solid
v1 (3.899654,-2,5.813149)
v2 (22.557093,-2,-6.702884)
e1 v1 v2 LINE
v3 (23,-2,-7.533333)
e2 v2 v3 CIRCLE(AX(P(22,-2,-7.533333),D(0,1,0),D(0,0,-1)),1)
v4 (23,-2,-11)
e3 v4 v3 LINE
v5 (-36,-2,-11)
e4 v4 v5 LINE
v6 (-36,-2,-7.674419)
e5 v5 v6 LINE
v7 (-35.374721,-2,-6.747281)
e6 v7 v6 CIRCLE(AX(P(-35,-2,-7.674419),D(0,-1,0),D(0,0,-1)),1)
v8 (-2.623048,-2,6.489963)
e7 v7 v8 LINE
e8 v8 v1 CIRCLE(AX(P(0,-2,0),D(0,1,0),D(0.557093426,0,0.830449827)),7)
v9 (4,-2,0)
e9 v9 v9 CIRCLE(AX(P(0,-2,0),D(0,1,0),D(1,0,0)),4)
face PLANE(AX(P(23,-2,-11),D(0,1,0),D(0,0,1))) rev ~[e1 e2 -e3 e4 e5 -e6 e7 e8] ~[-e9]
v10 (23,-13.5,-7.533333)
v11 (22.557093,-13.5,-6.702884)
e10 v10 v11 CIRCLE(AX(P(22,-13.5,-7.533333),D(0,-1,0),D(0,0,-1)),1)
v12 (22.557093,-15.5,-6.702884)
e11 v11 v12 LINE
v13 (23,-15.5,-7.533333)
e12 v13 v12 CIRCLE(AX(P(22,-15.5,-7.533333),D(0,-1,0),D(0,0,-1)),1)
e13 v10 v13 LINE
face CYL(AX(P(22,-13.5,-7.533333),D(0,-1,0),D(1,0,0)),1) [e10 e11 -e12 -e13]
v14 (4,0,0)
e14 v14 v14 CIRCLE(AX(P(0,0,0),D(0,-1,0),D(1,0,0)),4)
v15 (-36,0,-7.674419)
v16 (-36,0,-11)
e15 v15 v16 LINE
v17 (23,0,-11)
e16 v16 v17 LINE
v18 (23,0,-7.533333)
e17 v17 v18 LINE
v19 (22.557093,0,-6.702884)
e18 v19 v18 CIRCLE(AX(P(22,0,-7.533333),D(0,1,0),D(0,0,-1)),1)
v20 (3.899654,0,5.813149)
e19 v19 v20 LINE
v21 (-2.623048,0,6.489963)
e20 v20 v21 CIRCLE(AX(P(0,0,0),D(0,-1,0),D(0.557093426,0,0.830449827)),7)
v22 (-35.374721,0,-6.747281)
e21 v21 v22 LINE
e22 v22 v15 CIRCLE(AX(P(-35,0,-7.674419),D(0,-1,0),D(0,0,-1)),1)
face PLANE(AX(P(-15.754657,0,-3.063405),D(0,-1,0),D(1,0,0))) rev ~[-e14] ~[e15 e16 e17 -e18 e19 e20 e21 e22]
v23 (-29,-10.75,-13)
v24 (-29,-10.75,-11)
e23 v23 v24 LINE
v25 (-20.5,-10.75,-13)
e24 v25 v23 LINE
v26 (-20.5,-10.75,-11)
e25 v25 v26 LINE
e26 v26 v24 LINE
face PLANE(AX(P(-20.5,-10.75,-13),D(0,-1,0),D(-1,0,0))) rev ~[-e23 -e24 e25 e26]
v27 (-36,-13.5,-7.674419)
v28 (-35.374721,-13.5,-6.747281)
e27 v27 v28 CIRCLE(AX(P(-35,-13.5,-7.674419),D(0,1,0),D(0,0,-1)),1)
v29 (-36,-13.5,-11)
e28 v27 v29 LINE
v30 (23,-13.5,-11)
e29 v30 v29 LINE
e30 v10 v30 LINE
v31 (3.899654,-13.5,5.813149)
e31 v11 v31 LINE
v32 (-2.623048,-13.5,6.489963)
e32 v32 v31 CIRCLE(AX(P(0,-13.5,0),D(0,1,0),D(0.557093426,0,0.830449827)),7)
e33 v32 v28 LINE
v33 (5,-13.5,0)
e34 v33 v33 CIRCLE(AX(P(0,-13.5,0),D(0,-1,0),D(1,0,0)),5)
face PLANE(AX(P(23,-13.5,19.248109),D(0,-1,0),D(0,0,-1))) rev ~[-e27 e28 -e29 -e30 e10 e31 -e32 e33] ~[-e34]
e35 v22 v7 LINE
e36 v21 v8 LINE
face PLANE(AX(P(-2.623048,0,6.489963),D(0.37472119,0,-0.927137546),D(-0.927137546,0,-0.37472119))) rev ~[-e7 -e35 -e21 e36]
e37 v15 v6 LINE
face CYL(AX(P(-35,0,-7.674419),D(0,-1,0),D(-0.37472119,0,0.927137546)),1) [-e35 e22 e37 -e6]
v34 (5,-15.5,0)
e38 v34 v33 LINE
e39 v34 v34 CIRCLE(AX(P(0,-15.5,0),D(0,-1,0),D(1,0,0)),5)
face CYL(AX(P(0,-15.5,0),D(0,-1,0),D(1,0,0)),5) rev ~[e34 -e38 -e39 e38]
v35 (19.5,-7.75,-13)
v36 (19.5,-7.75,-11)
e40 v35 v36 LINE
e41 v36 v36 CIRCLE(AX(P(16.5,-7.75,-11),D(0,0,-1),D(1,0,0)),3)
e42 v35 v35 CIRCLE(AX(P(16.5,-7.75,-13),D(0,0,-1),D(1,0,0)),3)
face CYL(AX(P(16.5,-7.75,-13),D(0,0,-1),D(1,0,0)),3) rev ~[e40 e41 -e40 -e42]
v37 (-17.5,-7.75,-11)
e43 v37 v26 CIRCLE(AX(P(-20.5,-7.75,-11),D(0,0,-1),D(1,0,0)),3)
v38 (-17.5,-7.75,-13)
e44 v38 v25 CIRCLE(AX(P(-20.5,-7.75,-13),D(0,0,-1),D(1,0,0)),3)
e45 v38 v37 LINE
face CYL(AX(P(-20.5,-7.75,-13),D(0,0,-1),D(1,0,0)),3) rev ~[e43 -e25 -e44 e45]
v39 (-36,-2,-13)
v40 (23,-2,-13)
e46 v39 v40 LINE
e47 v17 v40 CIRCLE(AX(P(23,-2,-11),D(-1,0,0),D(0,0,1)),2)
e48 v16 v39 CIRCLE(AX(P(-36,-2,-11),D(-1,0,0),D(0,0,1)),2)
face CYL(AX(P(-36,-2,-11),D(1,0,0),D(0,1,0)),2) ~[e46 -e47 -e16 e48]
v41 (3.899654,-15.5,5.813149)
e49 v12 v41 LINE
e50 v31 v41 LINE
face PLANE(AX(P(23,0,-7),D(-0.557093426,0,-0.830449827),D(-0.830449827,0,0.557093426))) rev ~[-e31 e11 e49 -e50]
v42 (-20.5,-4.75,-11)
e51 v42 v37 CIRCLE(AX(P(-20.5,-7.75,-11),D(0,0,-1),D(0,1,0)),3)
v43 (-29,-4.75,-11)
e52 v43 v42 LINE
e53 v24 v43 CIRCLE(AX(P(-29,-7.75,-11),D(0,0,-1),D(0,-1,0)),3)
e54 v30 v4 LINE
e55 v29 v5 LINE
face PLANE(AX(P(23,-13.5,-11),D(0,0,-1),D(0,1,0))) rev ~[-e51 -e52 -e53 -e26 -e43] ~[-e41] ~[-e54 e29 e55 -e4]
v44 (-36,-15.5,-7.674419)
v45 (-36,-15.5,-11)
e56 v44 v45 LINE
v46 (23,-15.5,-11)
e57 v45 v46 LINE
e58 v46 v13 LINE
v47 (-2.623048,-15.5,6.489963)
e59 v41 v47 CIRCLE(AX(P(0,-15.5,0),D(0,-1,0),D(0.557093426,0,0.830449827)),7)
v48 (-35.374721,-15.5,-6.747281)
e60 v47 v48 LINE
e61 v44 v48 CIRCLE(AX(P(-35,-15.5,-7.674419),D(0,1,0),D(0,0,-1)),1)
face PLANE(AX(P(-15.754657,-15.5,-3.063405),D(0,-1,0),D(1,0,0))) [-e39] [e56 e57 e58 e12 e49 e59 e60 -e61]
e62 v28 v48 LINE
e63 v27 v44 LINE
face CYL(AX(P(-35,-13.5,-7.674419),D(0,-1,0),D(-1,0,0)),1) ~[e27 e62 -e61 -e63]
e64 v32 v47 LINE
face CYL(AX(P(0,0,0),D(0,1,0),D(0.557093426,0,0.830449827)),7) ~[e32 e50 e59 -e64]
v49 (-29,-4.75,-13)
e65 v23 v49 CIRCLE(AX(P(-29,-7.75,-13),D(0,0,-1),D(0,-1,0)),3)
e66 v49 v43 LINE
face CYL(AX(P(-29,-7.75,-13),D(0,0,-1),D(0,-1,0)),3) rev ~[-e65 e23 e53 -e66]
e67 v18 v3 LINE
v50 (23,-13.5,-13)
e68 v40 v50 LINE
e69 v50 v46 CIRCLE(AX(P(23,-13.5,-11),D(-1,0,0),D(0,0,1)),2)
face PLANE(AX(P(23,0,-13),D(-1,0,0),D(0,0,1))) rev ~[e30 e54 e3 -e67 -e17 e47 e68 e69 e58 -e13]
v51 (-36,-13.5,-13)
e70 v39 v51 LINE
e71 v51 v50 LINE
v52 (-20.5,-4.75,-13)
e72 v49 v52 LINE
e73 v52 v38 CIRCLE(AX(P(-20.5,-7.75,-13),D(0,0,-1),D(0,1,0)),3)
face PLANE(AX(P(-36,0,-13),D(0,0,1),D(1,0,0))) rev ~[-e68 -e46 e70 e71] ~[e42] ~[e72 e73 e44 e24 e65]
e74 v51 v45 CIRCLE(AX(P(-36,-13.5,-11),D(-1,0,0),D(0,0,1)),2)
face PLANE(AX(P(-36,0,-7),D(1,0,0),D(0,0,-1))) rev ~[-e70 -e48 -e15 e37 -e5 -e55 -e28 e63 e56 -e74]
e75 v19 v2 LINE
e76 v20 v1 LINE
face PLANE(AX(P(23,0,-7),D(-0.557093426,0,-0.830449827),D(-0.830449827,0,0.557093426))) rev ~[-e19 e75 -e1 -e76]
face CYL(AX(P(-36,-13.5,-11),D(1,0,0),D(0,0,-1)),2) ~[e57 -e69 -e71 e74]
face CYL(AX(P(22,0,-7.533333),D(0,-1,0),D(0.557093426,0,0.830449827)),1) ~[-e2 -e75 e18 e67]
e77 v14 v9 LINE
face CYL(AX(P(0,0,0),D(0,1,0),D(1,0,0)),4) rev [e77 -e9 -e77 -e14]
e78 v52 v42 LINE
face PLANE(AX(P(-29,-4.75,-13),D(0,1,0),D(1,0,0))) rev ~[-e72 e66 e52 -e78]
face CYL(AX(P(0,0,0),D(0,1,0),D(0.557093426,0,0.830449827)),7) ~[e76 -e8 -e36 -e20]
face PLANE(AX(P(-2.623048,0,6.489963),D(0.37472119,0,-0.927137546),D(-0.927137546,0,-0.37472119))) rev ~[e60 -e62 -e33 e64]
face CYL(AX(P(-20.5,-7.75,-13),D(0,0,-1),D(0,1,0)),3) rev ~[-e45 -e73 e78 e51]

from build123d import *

# Parameters (mm, degrees)
F0_R     = 5
F0_R_2   = 4
F1_DEPTH = 15.5
F2_W     = 11.5
F2_H     = 26.2481089791
F2_H_2   = 4
F3_DEPTH = 59.001
F4_R     = 3
F5_DEPTH = 2
F6_R     = 1
F7_R     = 2
F8_R     = 5
F8_R_2   = 4
F9_DEPTH = 2


# Not quite as in the source:
# - a feature names something its author has since deleted; it is built from what else it names


with BuildPart() as f1:
    # F0 (on Front) → F1 (new body)
    with BuildSketch(Plane.XZ):
        with BuildLine():
            Line((-36, -7), (-4.54e-08, -7))
            ThreePointArc((-4.54e-08, -7), (-6.871307732, -1.3360875914), (-2.6230483271, 6.4899628253))
            Line((-2.6230483271, 6.4899628253), (-36, -7))
        make_face()
        Polygon((23, -7), (-4.54e-08, -7), (-36, -7), (-36, -13), (23, -13), align=None)
        with BuildLine():
            ThreePointArc((3.8996539792, 5.8131487889), (6.1764705882, 3.2941176471), (7, 0))
            ThreePointArc((7, 0), (4.9497474522, -4.9497474844), (-4.54e-08, -7))
            Line((-4.54e-08, -7), (23, -7))
            Line((23, -7), (3.8996539792, 5.8131487889))
        make_face()
        with BuildLine():
            ThreePointArc((-4.54e-08, -7), (4.9497474522, -4.9497474844), (7, 0))
            ThreePointArc((7, 0), (6.1764705882, 3.2941176471), (3.8996539792, 5.8131487889))
            ThreePointArc((3.8996539792, 5.8131487889), (0.7224609385, 6.9626180559), (-2.6230483271, 6.4899628253))
            ThreePointArc((-2.6230483271, 6.4899628253), (-6.871307732, -1.3360875914), (-4.54e-08, -7))
        make_face()
        Circle(F0_R, mode=Mode.SUBTRACT)
        Circle(F0_R)
        Circle(F0_R_2, mode=Mode.SUBTRACT)
    extrude(amount=F1_DEPTH)

    # F2 (on face) → F3 (cut, through all)
    with BuildSketch(Plane.YZ.offset(23)):
        with Locations((-7.75, 6.1240544895)):
            Rectangle(F2_W, F2_H)
        with Locations((-7.75, -9)):
            Rectangle(F2_W, F2_H_2)
    extrude(amount=-F3_DEPTH, mode=Mode.SUBTRACT)

    # F4 (on face) → F5 (cut)
    with BuildSketch(Plane(origin=(0, 0, -13), x_dir=(1, 0, 0), z_dir=(0, 0, -1))):
        with BuildLine():
            ThreePointArc((-29, 4.75), (-26.8786796564, 5.6286796564), (-26, 7.75))
            ThreePointArc((-26, 7.75), (-26.8786796564, 9.8713203436), (-29, 10.75))
            ThreePointArc((-29, 10.75), (-32, 7.75), (-29, 4.75))
        make_face()
        with BuildLine():
            ThreePointArc((-29, 10.75), (-26.8786796564, 9.8713203436), (-26, 7.75))
            ThreePointArc((-26, 7.75), (-26.8786796564, 5.6286796564), (-29, 4.75))
            Line((-29, 4.75), (-20.5, 4.75))
            ThreePointArc((-20.5, 4.75), (-23.5, 7.75), (-20.5, 10.75))
            Line((-20.5, 10.75), (-29, 10.75))
        make_face()
        with BuildLine():
            ThreePointArc((-17.5, 7.75), (-18.3786796564, 9.8713203436), (-20.5, 10.75))
            ThreePointArc((-20.5, 10.75), (-23.5, 7.75), (-20.5, 4.75))
            ThreePointArc((-20.5, 4.75), (-18.3786796564, 5.6286796564), (-17.5, 7.75))
        make_face()
        with Locations((16.5, 7.75)):
            Circle(F4_R)
    extrude(amount=-F5_DEPTH, mode=Mode.SUBTRACT)

    # F6
    f6_edges = [f1.edges().sort_by_distance(p)[0] for p in [
        (-36, -14.5, -7),
        (-36, -1, -7),
        (23, -14.5, -7),
        (23, -1, -7),
    ]]
    fillet(f6_edges, radius=F6_R)

    # F7
    f7_edges = [f1.edges().sort_by_distance(p)[0] for p in [
        (-6.5, -15.5, -13),
        (-6.5, 0, -13),
    ]]
    fillet(f7_edges, radius=F7_R)

    # F8 (on face) → F9 (cut, through all)
    with BuildSketch(Plane.XZ.offset(15.5)):
        Circle(F8_R)
        Circle(F8_R_2, mode=Mode.SUBTRACT)
    extrude(amount=-F9_DEPTH, mode=Mode.SUBTRACT)


solid = f1.part
